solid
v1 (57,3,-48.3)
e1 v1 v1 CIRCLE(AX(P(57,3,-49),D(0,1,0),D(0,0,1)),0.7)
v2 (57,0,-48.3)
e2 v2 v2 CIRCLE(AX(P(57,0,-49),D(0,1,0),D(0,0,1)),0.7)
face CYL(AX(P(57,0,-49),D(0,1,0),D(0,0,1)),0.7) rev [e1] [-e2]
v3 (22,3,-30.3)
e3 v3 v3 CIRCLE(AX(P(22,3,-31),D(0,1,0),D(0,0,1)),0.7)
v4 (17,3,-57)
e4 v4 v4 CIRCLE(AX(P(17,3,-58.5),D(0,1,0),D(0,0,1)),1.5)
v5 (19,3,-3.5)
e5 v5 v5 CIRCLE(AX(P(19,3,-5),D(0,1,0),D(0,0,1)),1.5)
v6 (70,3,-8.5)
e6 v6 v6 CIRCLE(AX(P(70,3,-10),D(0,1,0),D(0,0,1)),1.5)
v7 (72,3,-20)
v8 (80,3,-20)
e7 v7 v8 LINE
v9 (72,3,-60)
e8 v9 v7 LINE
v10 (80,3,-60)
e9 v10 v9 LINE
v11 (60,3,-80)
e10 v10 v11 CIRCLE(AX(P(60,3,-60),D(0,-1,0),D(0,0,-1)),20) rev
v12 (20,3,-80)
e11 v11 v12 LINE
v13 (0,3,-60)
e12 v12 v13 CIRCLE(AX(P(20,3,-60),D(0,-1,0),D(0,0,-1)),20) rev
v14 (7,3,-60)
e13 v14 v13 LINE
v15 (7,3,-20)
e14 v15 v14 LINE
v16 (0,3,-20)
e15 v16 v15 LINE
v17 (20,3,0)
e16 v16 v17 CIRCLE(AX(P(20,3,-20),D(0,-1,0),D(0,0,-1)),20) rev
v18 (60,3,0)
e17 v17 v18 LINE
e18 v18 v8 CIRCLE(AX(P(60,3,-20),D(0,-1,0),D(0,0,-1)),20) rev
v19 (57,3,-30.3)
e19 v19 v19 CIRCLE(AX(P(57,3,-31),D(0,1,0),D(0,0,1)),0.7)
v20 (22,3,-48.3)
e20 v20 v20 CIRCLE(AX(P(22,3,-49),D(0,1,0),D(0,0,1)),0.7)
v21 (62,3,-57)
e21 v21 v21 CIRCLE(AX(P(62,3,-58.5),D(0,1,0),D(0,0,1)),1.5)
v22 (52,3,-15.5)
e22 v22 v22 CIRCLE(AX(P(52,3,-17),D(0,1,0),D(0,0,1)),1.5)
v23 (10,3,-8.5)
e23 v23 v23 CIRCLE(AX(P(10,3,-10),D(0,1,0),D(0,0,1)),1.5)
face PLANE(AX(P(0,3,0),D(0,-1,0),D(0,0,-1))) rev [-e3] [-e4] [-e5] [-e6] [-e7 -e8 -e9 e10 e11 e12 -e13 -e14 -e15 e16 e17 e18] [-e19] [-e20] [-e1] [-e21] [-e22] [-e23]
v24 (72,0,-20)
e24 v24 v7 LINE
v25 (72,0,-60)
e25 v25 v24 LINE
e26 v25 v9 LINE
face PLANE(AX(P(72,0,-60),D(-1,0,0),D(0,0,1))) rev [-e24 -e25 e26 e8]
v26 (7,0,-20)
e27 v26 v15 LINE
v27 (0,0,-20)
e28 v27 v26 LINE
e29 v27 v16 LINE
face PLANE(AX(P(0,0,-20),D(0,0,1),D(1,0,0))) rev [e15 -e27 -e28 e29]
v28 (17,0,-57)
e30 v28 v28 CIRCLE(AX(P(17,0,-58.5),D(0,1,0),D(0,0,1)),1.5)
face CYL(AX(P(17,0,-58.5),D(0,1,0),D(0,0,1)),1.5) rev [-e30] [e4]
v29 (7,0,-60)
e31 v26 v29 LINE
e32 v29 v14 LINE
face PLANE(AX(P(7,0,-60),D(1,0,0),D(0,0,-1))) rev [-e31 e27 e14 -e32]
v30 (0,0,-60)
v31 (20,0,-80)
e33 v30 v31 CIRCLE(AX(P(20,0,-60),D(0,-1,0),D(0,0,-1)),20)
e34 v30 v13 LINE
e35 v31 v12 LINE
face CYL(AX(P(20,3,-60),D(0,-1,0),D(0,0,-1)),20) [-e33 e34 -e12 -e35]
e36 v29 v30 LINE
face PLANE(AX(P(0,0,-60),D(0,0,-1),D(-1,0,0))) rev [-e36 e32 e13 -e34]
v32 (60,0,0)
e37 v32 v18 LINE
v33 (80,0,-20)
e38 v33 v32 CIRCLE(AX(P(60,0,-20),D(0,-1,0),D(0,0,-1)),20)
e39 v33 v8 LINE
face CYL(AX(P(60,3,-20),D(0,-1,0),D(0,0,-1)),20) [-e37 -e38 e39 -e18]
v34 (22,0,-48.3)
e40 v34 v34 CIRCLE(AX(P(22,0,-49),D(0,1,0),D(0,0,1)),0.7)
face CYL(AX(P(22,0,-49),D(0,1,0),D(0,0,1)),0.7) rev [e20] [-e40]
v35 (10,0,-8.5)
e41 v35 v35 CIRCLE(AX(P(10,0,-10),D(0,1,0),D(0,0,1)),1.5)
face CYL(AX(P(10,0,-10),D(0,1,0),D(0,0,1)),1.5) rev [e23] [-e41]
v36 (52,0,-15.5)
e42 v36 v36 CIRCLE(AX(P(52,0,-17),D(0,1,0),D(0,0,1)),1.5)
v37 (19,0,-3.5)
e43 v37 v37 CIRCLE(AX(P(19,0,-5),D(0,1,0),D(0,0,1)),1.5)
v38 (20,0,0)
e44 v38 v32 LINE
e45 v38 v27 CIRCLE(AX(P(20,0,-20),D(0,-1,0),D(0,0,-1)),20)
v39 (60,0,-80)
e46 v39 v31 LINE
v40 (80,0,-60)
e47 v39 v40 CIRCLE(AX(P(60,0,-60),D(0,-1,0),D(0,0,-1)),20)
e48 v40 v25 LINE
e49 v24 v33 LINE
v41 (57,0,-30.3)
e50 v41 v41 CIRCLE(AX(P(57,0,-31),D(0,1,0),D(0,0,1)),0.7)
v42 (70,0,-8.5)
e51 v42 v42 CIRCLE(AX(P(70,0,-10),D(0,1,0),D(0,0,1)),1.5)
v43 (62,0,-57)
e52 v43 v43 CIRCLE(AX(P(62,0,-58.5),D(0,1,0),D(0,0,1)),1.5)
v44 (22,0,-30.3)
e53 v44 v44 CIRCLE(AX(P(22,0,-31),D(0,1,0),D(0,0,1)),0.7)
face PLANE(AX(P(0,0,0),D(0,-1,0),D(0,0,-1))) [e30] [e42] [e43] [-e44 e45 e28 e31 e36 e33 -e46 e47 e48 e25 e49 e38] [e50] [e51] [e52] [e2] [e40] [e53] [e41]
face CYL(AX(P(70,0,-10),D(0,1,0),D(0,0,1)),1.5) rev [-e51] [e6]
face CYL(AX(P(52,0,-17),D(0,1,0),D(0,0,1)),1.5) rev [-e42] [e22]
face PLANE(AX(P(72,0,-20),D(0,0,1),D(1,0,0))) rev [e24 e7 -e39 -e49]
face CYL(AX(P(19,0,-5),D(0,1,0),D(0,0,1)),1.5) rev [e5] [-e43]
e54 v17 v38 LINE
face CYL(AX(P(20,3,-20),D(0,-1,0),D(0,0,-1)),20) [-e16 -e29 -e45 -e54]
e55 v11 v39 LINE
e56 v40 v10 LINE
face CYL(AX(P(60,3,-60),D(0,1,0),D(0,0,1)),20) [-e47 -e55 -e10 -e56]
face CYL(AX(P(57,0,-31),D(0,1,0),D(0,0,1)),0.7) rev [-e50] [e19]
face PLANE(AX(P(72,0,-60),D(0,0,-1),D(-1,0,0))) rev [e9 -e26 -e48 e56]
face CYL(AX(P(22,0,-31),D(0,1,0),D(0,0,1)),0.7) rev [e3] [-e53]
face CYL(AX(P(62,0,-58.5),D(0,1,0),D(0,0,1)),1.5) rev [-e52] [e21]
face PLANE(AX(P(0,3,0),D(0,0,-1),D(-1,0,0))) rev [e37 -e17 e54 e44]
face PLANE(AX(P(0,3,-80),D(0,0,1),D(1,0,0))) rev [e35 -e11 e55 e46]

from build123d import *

# Parameters (mm, degrees)
SKETCH3_W           = 80
SKETCH3_H           = 80
BOSS_EXTRUDE1_DEPTH = 3
SKETCH4_W           = 7
SKETCH4_H           = 40
SKETCH4_W_2         = 8
CUT_EXTRUDE1_DEPTH  = 3
FILLET3_R           = 20
FILLET4_R           = 20
FILLET5_R           = 20
FILLET6_R           = 20
SKETCH6_R           = 1.5
CUT_EXTRUDE2_DEPTH  = 3
SKETCH9_R           = 1.5
CUT_EXTRUDE3_DEPTH  = 3
SKETCH10_R          = 1.5
CUT_EXTRUDE4_DEPTH  = 3
SKETCH11_R          = 0.7
CUT_EXTRUDE5_DEPTH  = 3


with BuildPart() as part:
    # Sketch3 → Boss-Extrude1 (new body)
    with BuildSketch(Plane(origin=(0, 0, 0), x_dir=(1, 0, 0), z_dir=(0, 1, 0))):
        with Locations((40, 40)):
            Rectangle(SKETCH3_W, SKETCH3_H)
    extrude(amount=BOSS_EXTRUDE1_DEPTH)

    # Sketch4 → Cut-Extrude1 (cut)
    with BuildSketch(Plane(origin=(0, 3, 0), x_dir=(1, 0, 0), z_dir=(0, 1, 0))):
        with Locations((3.5, 40)):
            Rectangle(SKETCH4_W, SKETCH4_H)
        with Locations((76, 40)):
            Rectangle(SKETCH4_W_2, SKETCH4_H)
    extrude(amount=-CUT_EXTRUDE1_DEPTH, mode=Mode.SUBTRACT)

    # Fillet3
    fillet3_edges = [part.edges().sort_by_distance(p)[0] for p in [
        (0, 1.5, -80),
    ]]
    fillet(fillet3_edges, radius=FILLET3_R - 0.0001)  # a hair under: the kernel refuses the full size

    # Fillet4
    fillet4_edges = [part.edges().sort_by_distance(p)[0] for p in [
        (80, 1.5, -80),
    ]]
    fillet(fillet4_edges, radius=FILLET4_R - 0.0001)  # a hair under: the kernel refuses the full size

    # Fillet5
    fillet5_edges = [part.edges().sort_by_distance(p)[0] for p in [
        (80, 1.5, 0),
    ]]
    fillet(fillet5_edges, radius=FILLET5_R - 0.0001)  # a hair under: the kernel refuses the full size

    # Fillet6
    fillet6_edges = [part.edges().sort_by_distance(p)[0] for p in [
        (0, 1.5, 0),
    ]]
    fillet(fillet6_edges, radius=FILLET6_R - 0.0001)  # a hair under: the kernel refuses the full size

    # Sketch6 → Cut-Extrude2 (cut)
    with BuildSketch(Plane(origin=(0, 3, 0), x_dir=(1, 0, 0), z_dir=(0, 1, 0))):
        with Locations(Location((17, 58.5, 0), (0, 0, 270))):
            Circle(SKETCH6_R)
        with Locations(Location((62, 58.5, 0), (0, 0, 270))):
            Circle(SKETCH6_R)
    extrude(amount=-CUT_EXTRUDE2_DEPTH, mode=Mode.SUBTRACT)

    # Sketch9 → Cut-Extrude3 (cut)
    with BuildSketch(Plane(origin=(0, 3, 0), x_dir=(1, 0, 0), z_dir=(0, 1, 0))):
        with Locations(Location((70, 10, 0), (0, 0, 270))):
            Circle(SKETCH9_R)
        with Locations(Location((10, 10, 0), (0, 0, 270))):
            Circle(SKETCH9_R)
    extrude(amount=-CUT_EXTRUDE3_DEPTH, mode=Mode.SUBTRACT)

    # Sketch10 → Cut-Extrude4 (cut)
    with BuildSketch(Plane(origin=(0, 3, 0), x_dir=(1, 0, 0), z_dir=(0, 1, 0))):
        with Locations(Location((19, 5, 0), (0, 0, 270))):
            Circle(SKETCH10_R)
        with Locations(Location((52, 17, 0), (0, 0, 270))):
            Circle(SKETCH10_R)
    extrude(amount=-CUT_EXTRUDE4_DEPTH, mode=Mode.SUBTRACT)

    # Sketch11 → Cut-Extrude5 (cut)
    with BuildSketch(Plane(origin=(0, 3, 0), x_dir=(1, 0, 0), z_dir=(0, 1, 0))):
        with Locations(Location((22, 49, 0), (0, 0, 270))):
            Circle(SKETCH11_R)
        with Locations(Location((22, 31, 0), (0, 0, 270))):
            Circle(SKETCH11_R)
        with Locations(Location((57, 49, 0), (0, 0, 270))):
            Circle(SKETCH11_R)
        with Locations(Location((57, 31, 0), (0, 0, 270))):
            Circle(SKETCH11_R)
    extrude(amount=-CUT_EXTRUDE5_DEPTH, mode=Mode.SUBTRACT)


solid = part.part
